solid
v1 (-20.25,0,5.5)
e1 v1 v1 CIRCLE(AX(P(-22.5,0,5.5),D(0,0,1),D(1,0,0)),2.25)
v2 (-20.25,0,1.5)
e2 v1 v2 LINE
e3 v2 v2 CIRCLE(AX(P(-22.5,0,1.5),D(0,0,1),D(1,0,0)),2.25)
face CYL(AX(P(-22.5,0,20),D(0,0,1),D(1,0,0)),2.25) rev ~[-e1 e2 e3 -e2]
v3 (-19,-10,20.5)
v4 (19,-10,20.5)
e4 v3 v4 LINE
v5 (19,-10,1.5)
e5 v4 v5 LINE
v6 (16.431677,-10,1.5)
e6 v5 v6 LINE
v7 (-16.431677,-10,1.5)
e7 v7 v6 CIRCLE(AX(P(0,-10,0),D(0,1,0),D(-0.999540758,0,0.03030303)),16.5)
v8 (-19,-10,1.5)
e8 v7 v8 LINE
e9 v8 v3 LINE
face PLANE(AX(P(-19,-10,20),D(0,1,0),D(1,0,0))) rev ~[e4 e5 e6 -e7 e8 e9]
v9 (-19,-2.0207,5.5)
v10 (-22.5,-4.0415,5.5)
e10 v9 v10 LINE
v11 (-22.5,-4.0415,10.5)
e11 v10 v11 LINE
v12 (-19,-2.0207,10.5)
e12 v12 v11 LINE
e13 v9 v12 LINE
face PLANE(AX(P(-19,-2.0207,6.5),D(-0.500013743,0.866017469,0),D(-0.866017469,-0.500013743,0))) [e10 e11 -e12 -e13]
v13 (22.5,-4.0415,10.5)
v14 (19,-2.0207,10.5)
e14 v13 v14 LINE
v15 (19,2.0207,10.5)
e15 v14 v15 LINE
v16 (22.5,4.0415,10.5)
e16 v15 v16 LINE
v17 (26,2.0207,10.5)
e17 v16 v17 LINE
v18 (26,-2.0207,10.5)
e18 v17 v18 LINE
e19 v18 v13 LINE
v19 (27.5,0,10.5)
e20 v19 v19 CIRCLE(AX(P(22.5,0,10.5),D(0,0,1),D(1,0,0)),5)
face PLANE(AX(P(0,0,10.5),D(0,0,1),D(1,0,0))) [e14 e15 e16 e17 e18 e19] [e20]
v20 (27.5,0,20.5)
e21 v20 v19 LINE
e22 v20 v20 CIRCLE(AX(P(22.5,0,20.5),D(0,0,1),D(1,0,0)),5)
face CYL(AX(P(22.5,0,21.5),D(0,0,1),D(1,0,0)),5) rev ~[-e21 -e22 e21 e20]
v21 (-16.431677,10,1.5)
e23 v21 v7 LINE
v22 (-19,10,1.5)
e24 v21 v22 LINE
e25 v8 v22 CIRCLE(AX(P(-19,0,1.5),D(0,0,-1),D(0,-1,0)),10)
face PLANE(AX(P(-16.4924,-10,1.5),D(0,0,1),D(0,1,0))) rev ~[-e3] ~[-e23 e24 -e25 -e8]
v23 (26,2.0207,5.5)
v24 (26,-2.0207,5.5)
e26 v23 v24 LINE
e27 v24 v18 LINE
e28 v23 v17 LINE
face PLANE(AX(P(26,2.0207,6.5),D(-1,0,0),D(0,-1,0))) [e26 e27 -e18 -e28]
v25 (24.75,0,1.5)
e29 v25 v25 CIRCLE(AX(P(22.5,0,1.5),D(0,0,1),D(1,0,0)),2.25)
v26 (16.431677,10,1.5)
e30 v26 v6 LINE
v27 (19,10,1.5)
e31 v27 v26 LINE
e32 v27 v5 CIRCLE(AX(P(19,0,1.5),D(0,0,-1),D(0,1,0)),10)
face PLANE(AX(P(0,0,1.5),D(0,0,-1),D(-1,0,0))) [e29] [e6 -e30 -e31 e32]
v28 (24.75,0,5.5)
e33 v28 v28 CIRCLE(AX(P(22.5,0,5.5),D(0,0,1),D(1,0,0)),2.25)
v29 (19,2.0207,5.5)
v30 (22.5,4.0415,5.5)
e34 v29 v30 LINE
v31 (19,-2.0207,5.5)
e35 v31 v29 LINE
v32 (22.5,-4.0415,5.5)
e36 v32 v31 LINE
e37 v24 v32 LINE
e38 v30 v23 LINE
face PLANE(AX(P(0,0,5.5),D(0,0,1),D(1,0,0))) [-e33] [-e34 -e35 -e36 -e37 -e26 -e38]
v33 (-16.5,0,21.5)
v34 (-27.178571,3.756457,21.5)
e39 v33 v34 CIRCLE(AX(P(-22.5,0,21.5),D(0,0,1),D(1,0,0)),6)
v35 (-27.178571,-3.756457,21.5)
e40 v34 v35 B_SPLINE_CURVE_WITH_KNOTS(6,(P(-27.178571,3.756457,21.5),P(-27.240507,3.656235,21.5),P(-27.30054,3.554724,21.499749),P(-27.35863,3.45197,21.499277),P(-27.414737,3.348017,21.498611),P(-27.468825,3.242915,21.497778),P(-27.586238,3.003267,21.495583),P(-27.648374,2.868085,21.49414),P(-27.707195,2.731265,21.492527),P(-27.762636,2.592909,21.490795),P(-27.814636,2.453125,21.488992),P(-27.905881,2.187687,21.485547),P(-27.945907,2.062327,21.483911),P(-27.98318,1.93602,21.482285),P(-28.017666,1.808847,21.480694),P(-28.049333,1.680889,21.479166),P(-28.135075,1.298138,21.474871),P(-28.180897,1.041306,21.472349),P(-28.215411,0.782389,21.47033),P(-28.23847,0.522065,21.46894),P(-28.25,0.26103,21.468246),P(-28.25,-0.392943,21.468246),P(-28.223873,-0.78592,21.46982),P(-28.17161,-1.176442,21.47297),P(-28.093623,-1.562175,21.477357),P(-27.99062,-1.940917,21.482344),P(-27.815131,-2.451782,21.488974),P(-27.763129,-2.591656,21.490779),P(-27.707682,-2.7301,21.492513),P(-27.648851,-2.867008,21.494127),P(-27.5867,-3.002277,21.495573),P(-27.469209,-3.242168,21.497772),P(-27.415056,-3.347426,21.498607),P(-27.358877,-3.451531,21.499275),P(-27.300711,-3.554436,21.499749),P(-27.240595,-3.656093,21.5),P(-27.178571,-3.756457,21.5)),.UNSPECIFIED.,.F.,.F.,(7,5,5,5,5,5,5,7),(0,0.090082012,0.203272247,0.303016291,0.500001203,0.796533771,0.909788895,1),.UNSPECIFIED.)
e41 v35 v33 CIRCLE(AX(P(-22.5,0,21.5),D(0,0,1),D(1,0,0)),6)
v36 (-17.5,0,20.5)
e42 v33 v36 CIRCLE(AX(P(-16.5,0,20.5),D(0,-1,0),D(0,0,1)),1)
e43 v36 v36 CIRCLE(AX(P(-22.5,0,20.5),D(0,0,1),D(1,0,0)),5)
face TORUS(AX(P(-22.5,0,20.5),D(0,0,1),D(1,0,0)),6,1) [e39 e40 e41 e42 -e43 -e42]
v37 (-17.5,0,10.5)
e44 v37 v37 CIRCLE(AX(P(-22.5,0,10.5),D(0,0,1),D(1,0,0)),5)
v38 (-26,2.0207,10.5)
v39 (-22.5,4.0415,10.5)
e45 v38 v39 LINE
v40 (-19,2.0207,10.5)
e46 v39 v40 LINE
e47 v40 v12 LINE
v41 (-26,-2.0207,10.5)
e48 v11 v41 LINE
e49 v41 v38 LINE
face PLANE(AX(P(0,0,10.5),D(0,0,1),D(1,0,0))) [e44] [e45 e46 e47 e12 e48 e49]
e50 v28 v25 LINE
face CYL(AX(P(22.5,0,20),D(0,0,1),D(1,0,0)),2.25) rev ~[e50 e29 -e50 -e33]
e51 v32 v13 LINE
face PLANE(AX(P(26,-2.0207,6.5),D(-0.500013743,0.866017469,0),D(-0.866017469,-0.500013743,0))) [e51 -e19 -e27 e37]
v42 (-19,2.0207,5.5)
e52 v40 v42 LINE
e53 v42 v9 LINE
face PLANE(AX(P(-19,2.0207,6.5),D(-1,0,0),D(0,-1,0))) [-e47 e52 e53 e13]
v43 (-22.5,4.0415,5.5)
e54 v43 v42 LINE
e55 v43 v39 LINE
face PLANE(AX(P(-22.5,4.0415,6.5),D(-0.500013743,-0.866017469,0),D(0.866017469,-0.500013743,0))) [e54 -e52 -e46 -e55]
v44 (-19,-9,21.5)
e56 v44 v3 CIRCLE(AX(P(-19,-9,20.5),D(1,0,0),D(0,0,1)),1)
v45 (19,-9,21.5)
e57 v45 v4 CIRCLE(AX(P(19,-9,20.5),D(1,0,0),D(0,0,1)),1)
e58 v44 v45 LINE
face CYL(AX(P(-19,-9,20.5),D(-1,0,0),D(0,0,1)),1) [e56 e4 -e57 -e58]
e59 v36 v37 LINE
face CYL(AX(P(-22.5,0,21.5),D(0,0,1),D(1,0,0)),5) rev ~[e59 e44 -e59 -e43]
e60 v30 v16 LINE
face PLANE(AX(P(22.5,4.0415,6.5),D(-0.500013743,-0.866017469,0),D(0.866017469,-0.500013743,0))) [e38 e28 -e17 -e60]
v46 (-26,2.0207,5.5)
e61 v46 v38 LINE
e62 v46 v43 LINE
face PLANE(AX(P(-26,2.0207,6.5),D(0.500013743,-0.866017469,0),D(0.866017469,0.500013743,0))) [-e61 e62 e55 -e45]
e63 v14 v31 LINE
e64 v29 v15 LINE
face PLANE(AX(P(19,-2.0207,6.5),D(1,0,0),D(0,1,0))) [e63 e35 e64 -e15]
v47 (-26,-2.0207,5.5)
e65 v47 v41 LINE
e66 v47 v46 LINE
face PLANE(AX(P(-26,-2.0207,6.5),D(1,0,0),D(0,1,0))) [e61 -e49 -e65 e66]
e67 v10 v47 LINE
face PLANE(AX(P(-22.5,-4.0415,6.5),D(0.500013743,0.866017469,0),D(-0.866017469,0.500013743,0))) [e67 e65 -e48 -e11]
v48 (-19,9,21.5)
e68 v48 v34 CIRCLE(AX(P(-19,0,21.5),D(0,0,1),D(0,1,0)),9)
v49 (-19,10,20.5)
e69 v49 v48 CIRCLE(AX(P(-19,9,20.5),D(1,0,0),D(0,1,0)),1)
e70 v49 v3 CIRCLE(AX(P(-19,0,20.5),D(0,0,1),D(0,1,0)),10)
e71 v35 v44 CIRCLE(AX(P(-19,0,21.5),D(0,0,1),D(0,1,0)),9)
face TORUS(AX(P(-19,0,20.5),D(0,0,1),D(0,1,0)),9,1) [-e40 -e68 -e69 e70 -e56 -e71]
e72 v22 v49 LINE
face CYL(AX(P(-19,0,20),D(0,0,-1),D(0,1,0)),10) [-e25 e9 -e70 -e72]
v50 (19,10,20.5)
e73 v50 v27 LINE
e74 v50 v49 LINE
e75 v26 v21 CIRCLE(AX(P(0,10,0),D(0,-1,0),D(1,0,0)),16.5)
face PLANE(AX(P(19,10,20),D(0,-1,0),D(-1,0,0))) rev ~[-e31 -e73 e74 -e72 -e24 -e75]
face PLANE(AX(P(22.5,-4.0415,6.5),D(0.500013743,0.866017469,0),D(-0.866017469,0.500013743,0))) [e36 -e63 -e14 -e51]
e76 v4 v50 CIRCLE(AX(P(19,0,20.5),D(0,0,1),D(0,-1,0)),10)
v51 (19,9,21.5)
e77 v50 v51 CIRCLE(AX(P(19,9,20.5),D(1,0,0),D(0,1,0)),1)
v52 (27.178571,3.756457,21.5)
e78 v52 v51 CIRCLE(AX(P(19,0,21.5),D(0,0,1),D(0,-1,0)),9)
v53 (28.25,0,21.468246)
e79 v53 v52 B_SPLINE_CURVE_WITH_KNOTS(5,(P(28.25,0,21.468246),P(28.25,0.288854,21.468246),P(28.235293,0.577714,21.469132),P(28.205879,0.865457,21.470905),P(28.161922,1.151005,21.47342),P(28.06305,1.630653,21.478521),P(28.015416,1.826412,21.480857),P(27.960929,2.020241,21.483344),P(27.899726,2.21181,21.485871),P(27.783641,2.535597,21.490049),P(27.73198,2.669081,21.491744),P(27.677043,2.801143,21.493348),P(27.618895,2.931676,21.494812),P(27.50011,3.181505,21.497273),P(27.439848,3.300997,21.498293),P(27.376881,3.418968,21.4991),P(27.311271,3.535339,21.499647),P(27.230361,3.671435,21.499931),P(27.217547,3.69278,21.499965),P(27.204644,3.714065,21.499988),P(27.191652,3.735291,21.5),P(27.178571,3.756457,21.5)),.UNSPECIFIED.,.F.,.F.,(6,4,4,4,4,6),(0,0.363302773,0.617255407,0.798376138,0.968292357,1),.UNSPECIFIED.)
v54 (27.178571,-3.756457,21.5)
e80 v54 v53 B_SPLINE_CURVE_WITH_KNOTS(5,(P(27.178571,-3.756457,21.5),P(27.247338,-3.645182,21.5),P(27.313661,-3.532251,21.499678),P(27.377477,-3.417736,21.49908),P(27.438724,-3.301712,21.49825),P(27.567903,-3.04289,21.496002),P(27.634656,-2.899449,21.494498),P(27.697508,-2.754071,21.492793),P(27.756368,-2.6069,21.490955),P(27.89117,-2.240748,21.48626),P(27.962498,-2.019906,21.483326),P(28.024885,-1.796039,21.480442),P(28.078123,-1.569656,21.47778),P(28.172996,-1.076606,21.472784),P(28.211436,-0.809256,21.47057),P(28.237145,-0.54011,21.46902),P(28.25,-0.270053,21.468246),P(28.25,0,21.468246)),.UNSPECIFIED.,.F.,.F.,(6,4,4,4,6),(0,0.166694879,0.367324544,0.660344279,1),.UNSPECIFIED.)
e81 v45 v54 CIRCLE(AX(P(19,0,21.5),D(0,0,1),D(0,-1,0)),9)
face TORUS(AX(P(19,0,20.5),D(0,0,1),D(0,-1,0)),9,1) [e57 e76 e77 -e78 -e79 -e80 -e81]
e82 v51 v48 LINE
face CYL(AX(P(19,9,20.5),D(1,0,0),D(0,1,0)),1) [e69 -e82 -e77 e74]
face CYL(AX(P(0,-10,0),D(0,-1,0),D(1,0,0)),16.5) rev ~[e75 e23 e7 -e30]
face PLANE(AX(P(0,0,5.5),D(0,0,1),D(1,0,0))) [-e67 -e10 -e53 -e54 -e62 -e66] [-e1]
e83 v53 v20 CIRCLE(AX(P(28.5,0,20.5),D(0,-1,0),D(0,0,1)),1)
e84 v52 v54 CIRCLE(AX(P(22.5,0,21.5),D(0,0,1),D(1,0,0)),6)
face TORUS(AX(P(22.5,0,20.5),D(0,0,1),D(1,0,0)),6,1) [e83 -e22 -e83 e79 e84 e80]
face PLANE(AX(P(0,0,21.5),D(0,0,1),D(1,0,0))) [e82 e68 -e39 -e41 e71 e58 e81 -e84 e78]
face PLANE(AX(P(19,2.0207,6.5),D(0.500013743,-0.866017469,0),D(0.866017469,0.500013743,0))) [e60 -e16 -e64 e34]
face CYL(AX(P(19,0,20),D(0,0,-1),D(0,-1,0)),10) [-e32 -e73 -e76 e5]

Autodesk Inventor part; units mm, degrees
ref_plane "YZ Plane" through (0, 0, 0) normal (1, 0, 0) x (0, 1, 0)
ref_plane "XZ Plane" through (0, 0, 0) normal (0, 1, 0) x (-1, 0, 0)
ref_plane "XY Plane" through (0, 0, 0) normal (0, 0, 1) x (1, 0, 0)
sketch "Sketch1" plane through (0, 0, 0) normal (0, 0, 1) x (1, 0, 0)
  line L0 (19, 10) -> (-19, 10) projected
  arc A0 (19, -10) -> (19, 10) centre (19, 0) ccw projected
  line L1 (-19, -10) -> (19, -10) projected
  arc A1 (-19, 10) -> (-19, -10) centre (-19, 0) ccw projected
  circle A2 centre (22.5, 0) radius 2.25 projected
  circle A3 centre (-22.5, 0) radius 2.25 projected
  point P0 (0, 0)
extrude "Extrusion1" add sketch "Sketch1" along normal blind 20 contours A0 L1 A1 L0 | A2 | A3
sketch "Sketch2" plane through (-19, -10, 0) normal (0, -1, 0) x (1, 0, 0)
  arc A0 (3, 0) -> (35, 0) centre (19, 0) ccw projected
  line L0 (3, 0) -> (0, 0) projected
  line L1 (0, -40) -> (0, 0) projected
  line L2 (0, -40) -> (38, -40) projected
  line L3 (38, -40) -> (38, 0) projected
  line L4 (38, 0) -> (35, 0) projected
  circle A1 centre (19, 0) radius 16
  line L5 (0, 0) -> (38, 0) projected
  line L6 (38, 0) -> (38, 20) projected
  line L7 (0, 20) -> (38, 20) projected
  line L8 (0, 0) -> (0, 20) projected
  point P0 (19, 0)
  point P1 (3, 0)
  point P2 (35, 0)
extrude "Extrusion2" cut sketch "Sketch2" against normal through all contours A1 L5
sketch "Sketch3" plane through (0, 0, 20) normal (0, 0, 1) x (1, 0, 0)
  arc A0 (-19, 10) -> (-19, -10) centre (-19, 0) ccw projected
  line L0 (-19, -10) -> (19, -10) projected
  arc A1 (19, -10) -> (19, 10) centre (19, 0) ccw projected
  line L1 (19, 10) -> (-19, 10) projected
  line L2 (-16, -10.4231) -> (-16, -76.7035)
  arc A2 (-19, 10) -> (-19, -10) centre (-19, 0) ccw projected
  line L3 (-29, 0) -> (-16, 0)
  circle A3 centre (-22.5, 0) radius 2.25
  line L4 (19, 10) -> (-19, 10) projected
  line L5 (0, 10) -> (0, -10)
  circle A4 centre (22.5, 0) radius 2.25
  line L6 (-22.5, 0) -> (-26, 0)
  line L7 (-26, 2.0207) -> (-22.5, 4.0415)
  line L8 (-22.5, 4.0415) -> (-19, 2.0207)
  line L9 (-19, 2.0207) -> (-19, -2.0207)
  line L10 (-19, -2.0207) -> (-22.5, -4.0415)
  line L11 (-22.5, -4.0415) -> (-26, -2.0207)
  line L12 (-26, -2.0207) -> (-26, 2.0207)
  line L13 (26, 2.0207) -> (22.5, 4.0415)
  line L14 (22.5, 4.0415) -> (19, 2.0207)
  line L15 (19, 2.0207) -> (19, -2.0207)
  line L16 (19, -2.0207) -> (22.5, -4.0415)
  line L17 (22.5, -4.0415) -> (26, -2.0207)
  line L18 (26, -2.0207) -> (26, 2.0207)
  point P0 (0, 0)
  dimension "d4" = 4.5
  dimension "d5" = 3.5
extrude "Extrusion3" [suppressed]
extrude "Extrusion4" cut sketch "Sketch3" against normal blind 5.5 contours L3 A3 | L3 A3 | A3 L3 L12 L7 L8 L9 | L3 L9 L10 L11 L12 A3 | A4 | L18 L17 L16 L15 L14 L13
extrude "Extrusion5" cut sketch "Sketch3" against normal through all contours L3 A3 | L3 A3 | A4
sketch "Sketch4" plane through (0, 0, 20) normal (0, 0, 1) x (1, 0, 0)
  line L0 (19, 2.0207) -> (22.5, 4.0415) projected
  line L1 (22.5, 4.0415) -> (26, 2.0207) projected
  line L2 (26, 2.0207) -> (26, -2.0207) projected
  line L3 (26, -2.0207) -> (22.5, -4.0415) projected
  line L4 (22.5, -4.0415) -> (19, -2.0207) projected
  line L5 (19, -2.0207) -> (19, 2.0207) projected
  line L6 (-19, -2.0207) -> (-22.5, -4.0415) projected
  line L7 (-22.5, -4.0415) -> (-26, -2.0207) projected
  line L8 (-26, -2.0207) -> (-26, 2.0207) projected
  line L9 (-26, 2.0207) -> (-22.5, 4.0415) projected
  line L10 (-22.5, 4.0415) -> (-19, 2.0207) projected
  line L11 (-19, 2.0207) -> (-19, -2.0207) projected
  arc A0 (-19, 10) -> (-19, -10) centre (-19, 0) ccw projected
  line L12 (-19, -10) -> (19, -10) projected
  arc A1 (19, -10) -> (19, 10) centre (19, 0) ccw projected
  line L13 (19, 10) -> (-19, 10) projected
  point P0 (0, 0)
extrude "Extrusion6" add sketch "Sketch4" along normal blind 1.5
sketch "Sketch5" plane through (0, 0, 0) normal (0, 0, -1) x (-1, 0, 0)
  circle A0 centre (-22.5, 0) radius 2.25 projected
  line L0 (-16, -10) -> (-16, 10) projected
  line L1 (-19, 10) -> (-16, 10) projected
  arc A1 (-19, 10) -> (-19, -10) centre (-19, 0) ccw projected
  line L2 (-16, -10) -> (-19, -10) projected
  circle A2 centre (22.5, 0) radius 2.25 projected
  line L3 (16, 10) -> (16, -10) projected
  line L4 (19, -10) -> (16, -10) projected
  arc A3 (19, -10) -> (19, 10) centre (19, 0) ccw projected
  line L5 (16, 10) -> (19, 10) projected
  point P0 (0, 0)
extrude "Extrusion7" cut sketch "Sketch5" against normal blind 0.5
sketch "Sketch6" plane through (0, -10, 0) normal (0, -1, 0) x (1, 0, 0)
  line L0 (-19, 0.5) -> (-19, 21.5) projected
  line L1 (-19, 0.5) -> (-16, 0.5) projected
  line L2 (-16, 0.5) -> (-16, 0) projected
  arc A0 (16, 0) -> (-16, 0) centre (0, 0) ccw projected
  line L3 (16, 0) -> (16, 0.5) projected
  line L4 (16, 0.5) -> (19, 0.5) projected
  line L5 (19, 0.5) -> (19, 21.5) projected
  arc A1 (16, 0) -> (-16, 0) centre (0, 0) ccw projected
  line L6 (0, 16) -> (0, 16.5)
  circle A2 centre (0, 0) radius 16.5
  line L7 (-19, 21.5) -> (19, 21.5) projected
  point P0 (0, 0)
  point P1 (16.4924, 0.5)
  point P2 (-16.4924, 0.5)
  dimension "d17" = 0.5
extrude "Extrusion8" cut sketch "Sketch6" against normal through all contours A2 L6 A0 L2 L1 | A2 L4 L3 A0 L6
sketch "Sketch7" plane through (0, 0, 21.5) normal (0, 0, 1) x (1, 0, 0)
  circle A0 centre (-22.5, 0) radius 2.25 projected
  line L0 (-22.5, -4.0415) -> (-26, -2.0207) projected
  line L1 (-19, -2.0207) -> (-22.5, -4.0415) projected
  line L2 (-19, 2.0207) -> (-19, -2.0207) projected
  line L3 (-22.5, 4.0415) -> (-19, 2.0207) projected
  line L4 (-26, 2.0207) -> (-22.5, 4.0415) projected
  line L5 (-26, -2.0207) -> (-26, 2.0207) projected
  circle A1 centre (22.5, 0) radius 2.25 projected
  line L6 (22.5, 4.0415) -> (26, 2.0207) projected
  line L7 (19, 2.0207) -> (22.5, 4.0415) projected
  line L8 (19, -2.0207) -> (19, 2.0207) projected
  line L9 (22.5, -4.0415) -> (19, -2.0207) projected
  line L10 (26, -2.0207) -> (22.5, -4.0415) projected
  line L11 (26, 2.0207) -> (26, -2.0207) projected
  point P0 (0, 0)
extrude "Extrusion9" cut sketch "Sketch7" against normal blind 15
sketch "Sketch8" plane through (0, 0, 21.5) normal (0, 0, 1) x (1, 0, 0)
  line L0 (-19, -10) -> (19, -10) projected
  arc A0 (19, -10) -> (19, 10) centre (19, 0) ccw projected
  line L1 (19, 10) -> (-19, 10) projected
  arc A1 (-19, 10) -> (-19, -10) centre (-19, 0) ccw projected
  line L2 (-19, -2.0207) -> (-22.5, -4.0415) projected
  line L3 (-22.5, -4.0415) -> (-26, -2.0207) projected
  line L4 (-26, -2.0207) -> (-26, 2.0207) projected
  line L5 (-26, 2.0207) -> (-22.5, 4.0415) projected
  line L6 (-22.5, 4.0415) -> (-19, 2.0207) projected
  line L7 (-19, 2.0207) -> (-19, -2.0207) projected
  line L8 (19, 2.0207) -> (22.5, 4.0415) projected
  line L9 (22.5, 4.0415) -> (26, 2.0207) projected
  line L10 (26, 2.0207) -> (26, -2.0207) projected
  line L11 (26, -2.0207) -> (22.5, -4.0415) projected
  line L12 (22.5, -4.0415) -> (19, -2.0207) projected
  line L13 (19, -2.0207) -> (19, 2.0207) projected
  circle A2 centre (-22.5, 0) radius 2.25 projected
  circle A3 centre (22.5, 0) radius 2.25 projected
  circle A4 centre (-22.5, 0) radius 5
  circle A5 centre (22.5, 0) radius 5
  point P0 (0, 0)
  dimension "d22" = 10
  dimension "d23" = 10
extrude "Extrusion10" cut sketch "Sketch8" against normal blind 11 contours L2 L3 L4 L5 L6 L7 | L8 L9 L10 L11 L12 L13 | A2 | A3 | A4 | A5
fillet "Fillet2" radius 1 6 edges at (0, -10, 21.5) (29, 0, 21.5) (0, 10, 21.5) (-29, 0, 21.5) (-27.5, 0, 21.5) (17.5, 0, 21.5)
sketch "Szkic9" plane through (0, 0, 6.5) normal (0, 0, 1) x (1, 0, 0)
  line L0 (-19, 2.0207) -> (-19, -2.0207) projected
  line L1 (-22.5, 4.0415) -> (-19, 2.0207) projected
  line L2 (-26, 2.0207) -> (-22.5, 4.0415) projected
  line L3 (-26, -2.0207) -> (-26, 2.0207) projected
  line L4 (-22.5, -4.0415) -> (-26, -2.0207) projected
  line L5 (-19, -2.0207) -> (-22.5, -4.0415) projected
  circle A0 centre (-22.5, 0) radius 2.25 projected
  line L6 (19, -2.0207) -> (19, 2.0207) projected
  line L7 (22.5, -4.0415) -> (19, -2.0207) projected
  line L8 (26, -2.0207) -> (22.5, -4.0415) projected
  line L9 (26, 2.0207) -> (26, -2.0207) projected
  line L10 (22.5, 4.0415) -> (26, 2.0207) projected
  line L11 (19, 2.0207) -> (22.5, 4.0415) projected
  circle A1 centre (22.5, 0) radius 2.25 projected
  point P0 (0, 0)
extrude "Wyciągnięcie proste11" cut sketch "Szkic9" against normal blind 1
sketch "Szkic10" plane through (0, 0, 0.5) normal (0, 0, -1) x (-1, 0, 0)
  line L0 (-16.4924, -10) -> (-16.4924, 10) projected
  line L1 (-19, 10) -> (-16.4924, 10) projected
  arc A0 (-19, 10) -> (-19, -10) centre (-19, 0) ccw projected
  line L2 (-16.4924, -10) -> (-19, -10) projected
  circle A1 centre (-22.5, 0) radius 2.25 projected
  circle A2 centre (22.5, 0) radius 2.25 projected
  line L3 (16.4924, 10) -> (16.4924, -10) projected
  line L4 (19, -10) -> (16.4924, -10) projected
  arc A3 (19, -10) -> (19, 10) centre (19, 0) ccw projected
  line L5 (16.4924, 10) -> (19, 10) projected
  point P0 (0, 0)
extrude "Wyciągnięcie proste12" cut sketch "Szkic10" against normal blind 1
sketch "Szkic11" plane through (-16.4924, -10, 0.5) normal (-1, 0, 0) x (0, 0, 1)
  line L0 (0, 20) -> (0, 0) projected
  line L1 (1, 0) -> (0, 0) projected
  line L2 (1, 0) -> (1, 20) projected
  line L3 (0, 20) -> (1, 20) projected
  point P0 (-0.5, 10)
extrude "Wyciągnięcie proste13" cut sketch "Szkic11" against normal through all
properties part number "Uchwyt_silnika_2_dół" material "Kauczuk"
